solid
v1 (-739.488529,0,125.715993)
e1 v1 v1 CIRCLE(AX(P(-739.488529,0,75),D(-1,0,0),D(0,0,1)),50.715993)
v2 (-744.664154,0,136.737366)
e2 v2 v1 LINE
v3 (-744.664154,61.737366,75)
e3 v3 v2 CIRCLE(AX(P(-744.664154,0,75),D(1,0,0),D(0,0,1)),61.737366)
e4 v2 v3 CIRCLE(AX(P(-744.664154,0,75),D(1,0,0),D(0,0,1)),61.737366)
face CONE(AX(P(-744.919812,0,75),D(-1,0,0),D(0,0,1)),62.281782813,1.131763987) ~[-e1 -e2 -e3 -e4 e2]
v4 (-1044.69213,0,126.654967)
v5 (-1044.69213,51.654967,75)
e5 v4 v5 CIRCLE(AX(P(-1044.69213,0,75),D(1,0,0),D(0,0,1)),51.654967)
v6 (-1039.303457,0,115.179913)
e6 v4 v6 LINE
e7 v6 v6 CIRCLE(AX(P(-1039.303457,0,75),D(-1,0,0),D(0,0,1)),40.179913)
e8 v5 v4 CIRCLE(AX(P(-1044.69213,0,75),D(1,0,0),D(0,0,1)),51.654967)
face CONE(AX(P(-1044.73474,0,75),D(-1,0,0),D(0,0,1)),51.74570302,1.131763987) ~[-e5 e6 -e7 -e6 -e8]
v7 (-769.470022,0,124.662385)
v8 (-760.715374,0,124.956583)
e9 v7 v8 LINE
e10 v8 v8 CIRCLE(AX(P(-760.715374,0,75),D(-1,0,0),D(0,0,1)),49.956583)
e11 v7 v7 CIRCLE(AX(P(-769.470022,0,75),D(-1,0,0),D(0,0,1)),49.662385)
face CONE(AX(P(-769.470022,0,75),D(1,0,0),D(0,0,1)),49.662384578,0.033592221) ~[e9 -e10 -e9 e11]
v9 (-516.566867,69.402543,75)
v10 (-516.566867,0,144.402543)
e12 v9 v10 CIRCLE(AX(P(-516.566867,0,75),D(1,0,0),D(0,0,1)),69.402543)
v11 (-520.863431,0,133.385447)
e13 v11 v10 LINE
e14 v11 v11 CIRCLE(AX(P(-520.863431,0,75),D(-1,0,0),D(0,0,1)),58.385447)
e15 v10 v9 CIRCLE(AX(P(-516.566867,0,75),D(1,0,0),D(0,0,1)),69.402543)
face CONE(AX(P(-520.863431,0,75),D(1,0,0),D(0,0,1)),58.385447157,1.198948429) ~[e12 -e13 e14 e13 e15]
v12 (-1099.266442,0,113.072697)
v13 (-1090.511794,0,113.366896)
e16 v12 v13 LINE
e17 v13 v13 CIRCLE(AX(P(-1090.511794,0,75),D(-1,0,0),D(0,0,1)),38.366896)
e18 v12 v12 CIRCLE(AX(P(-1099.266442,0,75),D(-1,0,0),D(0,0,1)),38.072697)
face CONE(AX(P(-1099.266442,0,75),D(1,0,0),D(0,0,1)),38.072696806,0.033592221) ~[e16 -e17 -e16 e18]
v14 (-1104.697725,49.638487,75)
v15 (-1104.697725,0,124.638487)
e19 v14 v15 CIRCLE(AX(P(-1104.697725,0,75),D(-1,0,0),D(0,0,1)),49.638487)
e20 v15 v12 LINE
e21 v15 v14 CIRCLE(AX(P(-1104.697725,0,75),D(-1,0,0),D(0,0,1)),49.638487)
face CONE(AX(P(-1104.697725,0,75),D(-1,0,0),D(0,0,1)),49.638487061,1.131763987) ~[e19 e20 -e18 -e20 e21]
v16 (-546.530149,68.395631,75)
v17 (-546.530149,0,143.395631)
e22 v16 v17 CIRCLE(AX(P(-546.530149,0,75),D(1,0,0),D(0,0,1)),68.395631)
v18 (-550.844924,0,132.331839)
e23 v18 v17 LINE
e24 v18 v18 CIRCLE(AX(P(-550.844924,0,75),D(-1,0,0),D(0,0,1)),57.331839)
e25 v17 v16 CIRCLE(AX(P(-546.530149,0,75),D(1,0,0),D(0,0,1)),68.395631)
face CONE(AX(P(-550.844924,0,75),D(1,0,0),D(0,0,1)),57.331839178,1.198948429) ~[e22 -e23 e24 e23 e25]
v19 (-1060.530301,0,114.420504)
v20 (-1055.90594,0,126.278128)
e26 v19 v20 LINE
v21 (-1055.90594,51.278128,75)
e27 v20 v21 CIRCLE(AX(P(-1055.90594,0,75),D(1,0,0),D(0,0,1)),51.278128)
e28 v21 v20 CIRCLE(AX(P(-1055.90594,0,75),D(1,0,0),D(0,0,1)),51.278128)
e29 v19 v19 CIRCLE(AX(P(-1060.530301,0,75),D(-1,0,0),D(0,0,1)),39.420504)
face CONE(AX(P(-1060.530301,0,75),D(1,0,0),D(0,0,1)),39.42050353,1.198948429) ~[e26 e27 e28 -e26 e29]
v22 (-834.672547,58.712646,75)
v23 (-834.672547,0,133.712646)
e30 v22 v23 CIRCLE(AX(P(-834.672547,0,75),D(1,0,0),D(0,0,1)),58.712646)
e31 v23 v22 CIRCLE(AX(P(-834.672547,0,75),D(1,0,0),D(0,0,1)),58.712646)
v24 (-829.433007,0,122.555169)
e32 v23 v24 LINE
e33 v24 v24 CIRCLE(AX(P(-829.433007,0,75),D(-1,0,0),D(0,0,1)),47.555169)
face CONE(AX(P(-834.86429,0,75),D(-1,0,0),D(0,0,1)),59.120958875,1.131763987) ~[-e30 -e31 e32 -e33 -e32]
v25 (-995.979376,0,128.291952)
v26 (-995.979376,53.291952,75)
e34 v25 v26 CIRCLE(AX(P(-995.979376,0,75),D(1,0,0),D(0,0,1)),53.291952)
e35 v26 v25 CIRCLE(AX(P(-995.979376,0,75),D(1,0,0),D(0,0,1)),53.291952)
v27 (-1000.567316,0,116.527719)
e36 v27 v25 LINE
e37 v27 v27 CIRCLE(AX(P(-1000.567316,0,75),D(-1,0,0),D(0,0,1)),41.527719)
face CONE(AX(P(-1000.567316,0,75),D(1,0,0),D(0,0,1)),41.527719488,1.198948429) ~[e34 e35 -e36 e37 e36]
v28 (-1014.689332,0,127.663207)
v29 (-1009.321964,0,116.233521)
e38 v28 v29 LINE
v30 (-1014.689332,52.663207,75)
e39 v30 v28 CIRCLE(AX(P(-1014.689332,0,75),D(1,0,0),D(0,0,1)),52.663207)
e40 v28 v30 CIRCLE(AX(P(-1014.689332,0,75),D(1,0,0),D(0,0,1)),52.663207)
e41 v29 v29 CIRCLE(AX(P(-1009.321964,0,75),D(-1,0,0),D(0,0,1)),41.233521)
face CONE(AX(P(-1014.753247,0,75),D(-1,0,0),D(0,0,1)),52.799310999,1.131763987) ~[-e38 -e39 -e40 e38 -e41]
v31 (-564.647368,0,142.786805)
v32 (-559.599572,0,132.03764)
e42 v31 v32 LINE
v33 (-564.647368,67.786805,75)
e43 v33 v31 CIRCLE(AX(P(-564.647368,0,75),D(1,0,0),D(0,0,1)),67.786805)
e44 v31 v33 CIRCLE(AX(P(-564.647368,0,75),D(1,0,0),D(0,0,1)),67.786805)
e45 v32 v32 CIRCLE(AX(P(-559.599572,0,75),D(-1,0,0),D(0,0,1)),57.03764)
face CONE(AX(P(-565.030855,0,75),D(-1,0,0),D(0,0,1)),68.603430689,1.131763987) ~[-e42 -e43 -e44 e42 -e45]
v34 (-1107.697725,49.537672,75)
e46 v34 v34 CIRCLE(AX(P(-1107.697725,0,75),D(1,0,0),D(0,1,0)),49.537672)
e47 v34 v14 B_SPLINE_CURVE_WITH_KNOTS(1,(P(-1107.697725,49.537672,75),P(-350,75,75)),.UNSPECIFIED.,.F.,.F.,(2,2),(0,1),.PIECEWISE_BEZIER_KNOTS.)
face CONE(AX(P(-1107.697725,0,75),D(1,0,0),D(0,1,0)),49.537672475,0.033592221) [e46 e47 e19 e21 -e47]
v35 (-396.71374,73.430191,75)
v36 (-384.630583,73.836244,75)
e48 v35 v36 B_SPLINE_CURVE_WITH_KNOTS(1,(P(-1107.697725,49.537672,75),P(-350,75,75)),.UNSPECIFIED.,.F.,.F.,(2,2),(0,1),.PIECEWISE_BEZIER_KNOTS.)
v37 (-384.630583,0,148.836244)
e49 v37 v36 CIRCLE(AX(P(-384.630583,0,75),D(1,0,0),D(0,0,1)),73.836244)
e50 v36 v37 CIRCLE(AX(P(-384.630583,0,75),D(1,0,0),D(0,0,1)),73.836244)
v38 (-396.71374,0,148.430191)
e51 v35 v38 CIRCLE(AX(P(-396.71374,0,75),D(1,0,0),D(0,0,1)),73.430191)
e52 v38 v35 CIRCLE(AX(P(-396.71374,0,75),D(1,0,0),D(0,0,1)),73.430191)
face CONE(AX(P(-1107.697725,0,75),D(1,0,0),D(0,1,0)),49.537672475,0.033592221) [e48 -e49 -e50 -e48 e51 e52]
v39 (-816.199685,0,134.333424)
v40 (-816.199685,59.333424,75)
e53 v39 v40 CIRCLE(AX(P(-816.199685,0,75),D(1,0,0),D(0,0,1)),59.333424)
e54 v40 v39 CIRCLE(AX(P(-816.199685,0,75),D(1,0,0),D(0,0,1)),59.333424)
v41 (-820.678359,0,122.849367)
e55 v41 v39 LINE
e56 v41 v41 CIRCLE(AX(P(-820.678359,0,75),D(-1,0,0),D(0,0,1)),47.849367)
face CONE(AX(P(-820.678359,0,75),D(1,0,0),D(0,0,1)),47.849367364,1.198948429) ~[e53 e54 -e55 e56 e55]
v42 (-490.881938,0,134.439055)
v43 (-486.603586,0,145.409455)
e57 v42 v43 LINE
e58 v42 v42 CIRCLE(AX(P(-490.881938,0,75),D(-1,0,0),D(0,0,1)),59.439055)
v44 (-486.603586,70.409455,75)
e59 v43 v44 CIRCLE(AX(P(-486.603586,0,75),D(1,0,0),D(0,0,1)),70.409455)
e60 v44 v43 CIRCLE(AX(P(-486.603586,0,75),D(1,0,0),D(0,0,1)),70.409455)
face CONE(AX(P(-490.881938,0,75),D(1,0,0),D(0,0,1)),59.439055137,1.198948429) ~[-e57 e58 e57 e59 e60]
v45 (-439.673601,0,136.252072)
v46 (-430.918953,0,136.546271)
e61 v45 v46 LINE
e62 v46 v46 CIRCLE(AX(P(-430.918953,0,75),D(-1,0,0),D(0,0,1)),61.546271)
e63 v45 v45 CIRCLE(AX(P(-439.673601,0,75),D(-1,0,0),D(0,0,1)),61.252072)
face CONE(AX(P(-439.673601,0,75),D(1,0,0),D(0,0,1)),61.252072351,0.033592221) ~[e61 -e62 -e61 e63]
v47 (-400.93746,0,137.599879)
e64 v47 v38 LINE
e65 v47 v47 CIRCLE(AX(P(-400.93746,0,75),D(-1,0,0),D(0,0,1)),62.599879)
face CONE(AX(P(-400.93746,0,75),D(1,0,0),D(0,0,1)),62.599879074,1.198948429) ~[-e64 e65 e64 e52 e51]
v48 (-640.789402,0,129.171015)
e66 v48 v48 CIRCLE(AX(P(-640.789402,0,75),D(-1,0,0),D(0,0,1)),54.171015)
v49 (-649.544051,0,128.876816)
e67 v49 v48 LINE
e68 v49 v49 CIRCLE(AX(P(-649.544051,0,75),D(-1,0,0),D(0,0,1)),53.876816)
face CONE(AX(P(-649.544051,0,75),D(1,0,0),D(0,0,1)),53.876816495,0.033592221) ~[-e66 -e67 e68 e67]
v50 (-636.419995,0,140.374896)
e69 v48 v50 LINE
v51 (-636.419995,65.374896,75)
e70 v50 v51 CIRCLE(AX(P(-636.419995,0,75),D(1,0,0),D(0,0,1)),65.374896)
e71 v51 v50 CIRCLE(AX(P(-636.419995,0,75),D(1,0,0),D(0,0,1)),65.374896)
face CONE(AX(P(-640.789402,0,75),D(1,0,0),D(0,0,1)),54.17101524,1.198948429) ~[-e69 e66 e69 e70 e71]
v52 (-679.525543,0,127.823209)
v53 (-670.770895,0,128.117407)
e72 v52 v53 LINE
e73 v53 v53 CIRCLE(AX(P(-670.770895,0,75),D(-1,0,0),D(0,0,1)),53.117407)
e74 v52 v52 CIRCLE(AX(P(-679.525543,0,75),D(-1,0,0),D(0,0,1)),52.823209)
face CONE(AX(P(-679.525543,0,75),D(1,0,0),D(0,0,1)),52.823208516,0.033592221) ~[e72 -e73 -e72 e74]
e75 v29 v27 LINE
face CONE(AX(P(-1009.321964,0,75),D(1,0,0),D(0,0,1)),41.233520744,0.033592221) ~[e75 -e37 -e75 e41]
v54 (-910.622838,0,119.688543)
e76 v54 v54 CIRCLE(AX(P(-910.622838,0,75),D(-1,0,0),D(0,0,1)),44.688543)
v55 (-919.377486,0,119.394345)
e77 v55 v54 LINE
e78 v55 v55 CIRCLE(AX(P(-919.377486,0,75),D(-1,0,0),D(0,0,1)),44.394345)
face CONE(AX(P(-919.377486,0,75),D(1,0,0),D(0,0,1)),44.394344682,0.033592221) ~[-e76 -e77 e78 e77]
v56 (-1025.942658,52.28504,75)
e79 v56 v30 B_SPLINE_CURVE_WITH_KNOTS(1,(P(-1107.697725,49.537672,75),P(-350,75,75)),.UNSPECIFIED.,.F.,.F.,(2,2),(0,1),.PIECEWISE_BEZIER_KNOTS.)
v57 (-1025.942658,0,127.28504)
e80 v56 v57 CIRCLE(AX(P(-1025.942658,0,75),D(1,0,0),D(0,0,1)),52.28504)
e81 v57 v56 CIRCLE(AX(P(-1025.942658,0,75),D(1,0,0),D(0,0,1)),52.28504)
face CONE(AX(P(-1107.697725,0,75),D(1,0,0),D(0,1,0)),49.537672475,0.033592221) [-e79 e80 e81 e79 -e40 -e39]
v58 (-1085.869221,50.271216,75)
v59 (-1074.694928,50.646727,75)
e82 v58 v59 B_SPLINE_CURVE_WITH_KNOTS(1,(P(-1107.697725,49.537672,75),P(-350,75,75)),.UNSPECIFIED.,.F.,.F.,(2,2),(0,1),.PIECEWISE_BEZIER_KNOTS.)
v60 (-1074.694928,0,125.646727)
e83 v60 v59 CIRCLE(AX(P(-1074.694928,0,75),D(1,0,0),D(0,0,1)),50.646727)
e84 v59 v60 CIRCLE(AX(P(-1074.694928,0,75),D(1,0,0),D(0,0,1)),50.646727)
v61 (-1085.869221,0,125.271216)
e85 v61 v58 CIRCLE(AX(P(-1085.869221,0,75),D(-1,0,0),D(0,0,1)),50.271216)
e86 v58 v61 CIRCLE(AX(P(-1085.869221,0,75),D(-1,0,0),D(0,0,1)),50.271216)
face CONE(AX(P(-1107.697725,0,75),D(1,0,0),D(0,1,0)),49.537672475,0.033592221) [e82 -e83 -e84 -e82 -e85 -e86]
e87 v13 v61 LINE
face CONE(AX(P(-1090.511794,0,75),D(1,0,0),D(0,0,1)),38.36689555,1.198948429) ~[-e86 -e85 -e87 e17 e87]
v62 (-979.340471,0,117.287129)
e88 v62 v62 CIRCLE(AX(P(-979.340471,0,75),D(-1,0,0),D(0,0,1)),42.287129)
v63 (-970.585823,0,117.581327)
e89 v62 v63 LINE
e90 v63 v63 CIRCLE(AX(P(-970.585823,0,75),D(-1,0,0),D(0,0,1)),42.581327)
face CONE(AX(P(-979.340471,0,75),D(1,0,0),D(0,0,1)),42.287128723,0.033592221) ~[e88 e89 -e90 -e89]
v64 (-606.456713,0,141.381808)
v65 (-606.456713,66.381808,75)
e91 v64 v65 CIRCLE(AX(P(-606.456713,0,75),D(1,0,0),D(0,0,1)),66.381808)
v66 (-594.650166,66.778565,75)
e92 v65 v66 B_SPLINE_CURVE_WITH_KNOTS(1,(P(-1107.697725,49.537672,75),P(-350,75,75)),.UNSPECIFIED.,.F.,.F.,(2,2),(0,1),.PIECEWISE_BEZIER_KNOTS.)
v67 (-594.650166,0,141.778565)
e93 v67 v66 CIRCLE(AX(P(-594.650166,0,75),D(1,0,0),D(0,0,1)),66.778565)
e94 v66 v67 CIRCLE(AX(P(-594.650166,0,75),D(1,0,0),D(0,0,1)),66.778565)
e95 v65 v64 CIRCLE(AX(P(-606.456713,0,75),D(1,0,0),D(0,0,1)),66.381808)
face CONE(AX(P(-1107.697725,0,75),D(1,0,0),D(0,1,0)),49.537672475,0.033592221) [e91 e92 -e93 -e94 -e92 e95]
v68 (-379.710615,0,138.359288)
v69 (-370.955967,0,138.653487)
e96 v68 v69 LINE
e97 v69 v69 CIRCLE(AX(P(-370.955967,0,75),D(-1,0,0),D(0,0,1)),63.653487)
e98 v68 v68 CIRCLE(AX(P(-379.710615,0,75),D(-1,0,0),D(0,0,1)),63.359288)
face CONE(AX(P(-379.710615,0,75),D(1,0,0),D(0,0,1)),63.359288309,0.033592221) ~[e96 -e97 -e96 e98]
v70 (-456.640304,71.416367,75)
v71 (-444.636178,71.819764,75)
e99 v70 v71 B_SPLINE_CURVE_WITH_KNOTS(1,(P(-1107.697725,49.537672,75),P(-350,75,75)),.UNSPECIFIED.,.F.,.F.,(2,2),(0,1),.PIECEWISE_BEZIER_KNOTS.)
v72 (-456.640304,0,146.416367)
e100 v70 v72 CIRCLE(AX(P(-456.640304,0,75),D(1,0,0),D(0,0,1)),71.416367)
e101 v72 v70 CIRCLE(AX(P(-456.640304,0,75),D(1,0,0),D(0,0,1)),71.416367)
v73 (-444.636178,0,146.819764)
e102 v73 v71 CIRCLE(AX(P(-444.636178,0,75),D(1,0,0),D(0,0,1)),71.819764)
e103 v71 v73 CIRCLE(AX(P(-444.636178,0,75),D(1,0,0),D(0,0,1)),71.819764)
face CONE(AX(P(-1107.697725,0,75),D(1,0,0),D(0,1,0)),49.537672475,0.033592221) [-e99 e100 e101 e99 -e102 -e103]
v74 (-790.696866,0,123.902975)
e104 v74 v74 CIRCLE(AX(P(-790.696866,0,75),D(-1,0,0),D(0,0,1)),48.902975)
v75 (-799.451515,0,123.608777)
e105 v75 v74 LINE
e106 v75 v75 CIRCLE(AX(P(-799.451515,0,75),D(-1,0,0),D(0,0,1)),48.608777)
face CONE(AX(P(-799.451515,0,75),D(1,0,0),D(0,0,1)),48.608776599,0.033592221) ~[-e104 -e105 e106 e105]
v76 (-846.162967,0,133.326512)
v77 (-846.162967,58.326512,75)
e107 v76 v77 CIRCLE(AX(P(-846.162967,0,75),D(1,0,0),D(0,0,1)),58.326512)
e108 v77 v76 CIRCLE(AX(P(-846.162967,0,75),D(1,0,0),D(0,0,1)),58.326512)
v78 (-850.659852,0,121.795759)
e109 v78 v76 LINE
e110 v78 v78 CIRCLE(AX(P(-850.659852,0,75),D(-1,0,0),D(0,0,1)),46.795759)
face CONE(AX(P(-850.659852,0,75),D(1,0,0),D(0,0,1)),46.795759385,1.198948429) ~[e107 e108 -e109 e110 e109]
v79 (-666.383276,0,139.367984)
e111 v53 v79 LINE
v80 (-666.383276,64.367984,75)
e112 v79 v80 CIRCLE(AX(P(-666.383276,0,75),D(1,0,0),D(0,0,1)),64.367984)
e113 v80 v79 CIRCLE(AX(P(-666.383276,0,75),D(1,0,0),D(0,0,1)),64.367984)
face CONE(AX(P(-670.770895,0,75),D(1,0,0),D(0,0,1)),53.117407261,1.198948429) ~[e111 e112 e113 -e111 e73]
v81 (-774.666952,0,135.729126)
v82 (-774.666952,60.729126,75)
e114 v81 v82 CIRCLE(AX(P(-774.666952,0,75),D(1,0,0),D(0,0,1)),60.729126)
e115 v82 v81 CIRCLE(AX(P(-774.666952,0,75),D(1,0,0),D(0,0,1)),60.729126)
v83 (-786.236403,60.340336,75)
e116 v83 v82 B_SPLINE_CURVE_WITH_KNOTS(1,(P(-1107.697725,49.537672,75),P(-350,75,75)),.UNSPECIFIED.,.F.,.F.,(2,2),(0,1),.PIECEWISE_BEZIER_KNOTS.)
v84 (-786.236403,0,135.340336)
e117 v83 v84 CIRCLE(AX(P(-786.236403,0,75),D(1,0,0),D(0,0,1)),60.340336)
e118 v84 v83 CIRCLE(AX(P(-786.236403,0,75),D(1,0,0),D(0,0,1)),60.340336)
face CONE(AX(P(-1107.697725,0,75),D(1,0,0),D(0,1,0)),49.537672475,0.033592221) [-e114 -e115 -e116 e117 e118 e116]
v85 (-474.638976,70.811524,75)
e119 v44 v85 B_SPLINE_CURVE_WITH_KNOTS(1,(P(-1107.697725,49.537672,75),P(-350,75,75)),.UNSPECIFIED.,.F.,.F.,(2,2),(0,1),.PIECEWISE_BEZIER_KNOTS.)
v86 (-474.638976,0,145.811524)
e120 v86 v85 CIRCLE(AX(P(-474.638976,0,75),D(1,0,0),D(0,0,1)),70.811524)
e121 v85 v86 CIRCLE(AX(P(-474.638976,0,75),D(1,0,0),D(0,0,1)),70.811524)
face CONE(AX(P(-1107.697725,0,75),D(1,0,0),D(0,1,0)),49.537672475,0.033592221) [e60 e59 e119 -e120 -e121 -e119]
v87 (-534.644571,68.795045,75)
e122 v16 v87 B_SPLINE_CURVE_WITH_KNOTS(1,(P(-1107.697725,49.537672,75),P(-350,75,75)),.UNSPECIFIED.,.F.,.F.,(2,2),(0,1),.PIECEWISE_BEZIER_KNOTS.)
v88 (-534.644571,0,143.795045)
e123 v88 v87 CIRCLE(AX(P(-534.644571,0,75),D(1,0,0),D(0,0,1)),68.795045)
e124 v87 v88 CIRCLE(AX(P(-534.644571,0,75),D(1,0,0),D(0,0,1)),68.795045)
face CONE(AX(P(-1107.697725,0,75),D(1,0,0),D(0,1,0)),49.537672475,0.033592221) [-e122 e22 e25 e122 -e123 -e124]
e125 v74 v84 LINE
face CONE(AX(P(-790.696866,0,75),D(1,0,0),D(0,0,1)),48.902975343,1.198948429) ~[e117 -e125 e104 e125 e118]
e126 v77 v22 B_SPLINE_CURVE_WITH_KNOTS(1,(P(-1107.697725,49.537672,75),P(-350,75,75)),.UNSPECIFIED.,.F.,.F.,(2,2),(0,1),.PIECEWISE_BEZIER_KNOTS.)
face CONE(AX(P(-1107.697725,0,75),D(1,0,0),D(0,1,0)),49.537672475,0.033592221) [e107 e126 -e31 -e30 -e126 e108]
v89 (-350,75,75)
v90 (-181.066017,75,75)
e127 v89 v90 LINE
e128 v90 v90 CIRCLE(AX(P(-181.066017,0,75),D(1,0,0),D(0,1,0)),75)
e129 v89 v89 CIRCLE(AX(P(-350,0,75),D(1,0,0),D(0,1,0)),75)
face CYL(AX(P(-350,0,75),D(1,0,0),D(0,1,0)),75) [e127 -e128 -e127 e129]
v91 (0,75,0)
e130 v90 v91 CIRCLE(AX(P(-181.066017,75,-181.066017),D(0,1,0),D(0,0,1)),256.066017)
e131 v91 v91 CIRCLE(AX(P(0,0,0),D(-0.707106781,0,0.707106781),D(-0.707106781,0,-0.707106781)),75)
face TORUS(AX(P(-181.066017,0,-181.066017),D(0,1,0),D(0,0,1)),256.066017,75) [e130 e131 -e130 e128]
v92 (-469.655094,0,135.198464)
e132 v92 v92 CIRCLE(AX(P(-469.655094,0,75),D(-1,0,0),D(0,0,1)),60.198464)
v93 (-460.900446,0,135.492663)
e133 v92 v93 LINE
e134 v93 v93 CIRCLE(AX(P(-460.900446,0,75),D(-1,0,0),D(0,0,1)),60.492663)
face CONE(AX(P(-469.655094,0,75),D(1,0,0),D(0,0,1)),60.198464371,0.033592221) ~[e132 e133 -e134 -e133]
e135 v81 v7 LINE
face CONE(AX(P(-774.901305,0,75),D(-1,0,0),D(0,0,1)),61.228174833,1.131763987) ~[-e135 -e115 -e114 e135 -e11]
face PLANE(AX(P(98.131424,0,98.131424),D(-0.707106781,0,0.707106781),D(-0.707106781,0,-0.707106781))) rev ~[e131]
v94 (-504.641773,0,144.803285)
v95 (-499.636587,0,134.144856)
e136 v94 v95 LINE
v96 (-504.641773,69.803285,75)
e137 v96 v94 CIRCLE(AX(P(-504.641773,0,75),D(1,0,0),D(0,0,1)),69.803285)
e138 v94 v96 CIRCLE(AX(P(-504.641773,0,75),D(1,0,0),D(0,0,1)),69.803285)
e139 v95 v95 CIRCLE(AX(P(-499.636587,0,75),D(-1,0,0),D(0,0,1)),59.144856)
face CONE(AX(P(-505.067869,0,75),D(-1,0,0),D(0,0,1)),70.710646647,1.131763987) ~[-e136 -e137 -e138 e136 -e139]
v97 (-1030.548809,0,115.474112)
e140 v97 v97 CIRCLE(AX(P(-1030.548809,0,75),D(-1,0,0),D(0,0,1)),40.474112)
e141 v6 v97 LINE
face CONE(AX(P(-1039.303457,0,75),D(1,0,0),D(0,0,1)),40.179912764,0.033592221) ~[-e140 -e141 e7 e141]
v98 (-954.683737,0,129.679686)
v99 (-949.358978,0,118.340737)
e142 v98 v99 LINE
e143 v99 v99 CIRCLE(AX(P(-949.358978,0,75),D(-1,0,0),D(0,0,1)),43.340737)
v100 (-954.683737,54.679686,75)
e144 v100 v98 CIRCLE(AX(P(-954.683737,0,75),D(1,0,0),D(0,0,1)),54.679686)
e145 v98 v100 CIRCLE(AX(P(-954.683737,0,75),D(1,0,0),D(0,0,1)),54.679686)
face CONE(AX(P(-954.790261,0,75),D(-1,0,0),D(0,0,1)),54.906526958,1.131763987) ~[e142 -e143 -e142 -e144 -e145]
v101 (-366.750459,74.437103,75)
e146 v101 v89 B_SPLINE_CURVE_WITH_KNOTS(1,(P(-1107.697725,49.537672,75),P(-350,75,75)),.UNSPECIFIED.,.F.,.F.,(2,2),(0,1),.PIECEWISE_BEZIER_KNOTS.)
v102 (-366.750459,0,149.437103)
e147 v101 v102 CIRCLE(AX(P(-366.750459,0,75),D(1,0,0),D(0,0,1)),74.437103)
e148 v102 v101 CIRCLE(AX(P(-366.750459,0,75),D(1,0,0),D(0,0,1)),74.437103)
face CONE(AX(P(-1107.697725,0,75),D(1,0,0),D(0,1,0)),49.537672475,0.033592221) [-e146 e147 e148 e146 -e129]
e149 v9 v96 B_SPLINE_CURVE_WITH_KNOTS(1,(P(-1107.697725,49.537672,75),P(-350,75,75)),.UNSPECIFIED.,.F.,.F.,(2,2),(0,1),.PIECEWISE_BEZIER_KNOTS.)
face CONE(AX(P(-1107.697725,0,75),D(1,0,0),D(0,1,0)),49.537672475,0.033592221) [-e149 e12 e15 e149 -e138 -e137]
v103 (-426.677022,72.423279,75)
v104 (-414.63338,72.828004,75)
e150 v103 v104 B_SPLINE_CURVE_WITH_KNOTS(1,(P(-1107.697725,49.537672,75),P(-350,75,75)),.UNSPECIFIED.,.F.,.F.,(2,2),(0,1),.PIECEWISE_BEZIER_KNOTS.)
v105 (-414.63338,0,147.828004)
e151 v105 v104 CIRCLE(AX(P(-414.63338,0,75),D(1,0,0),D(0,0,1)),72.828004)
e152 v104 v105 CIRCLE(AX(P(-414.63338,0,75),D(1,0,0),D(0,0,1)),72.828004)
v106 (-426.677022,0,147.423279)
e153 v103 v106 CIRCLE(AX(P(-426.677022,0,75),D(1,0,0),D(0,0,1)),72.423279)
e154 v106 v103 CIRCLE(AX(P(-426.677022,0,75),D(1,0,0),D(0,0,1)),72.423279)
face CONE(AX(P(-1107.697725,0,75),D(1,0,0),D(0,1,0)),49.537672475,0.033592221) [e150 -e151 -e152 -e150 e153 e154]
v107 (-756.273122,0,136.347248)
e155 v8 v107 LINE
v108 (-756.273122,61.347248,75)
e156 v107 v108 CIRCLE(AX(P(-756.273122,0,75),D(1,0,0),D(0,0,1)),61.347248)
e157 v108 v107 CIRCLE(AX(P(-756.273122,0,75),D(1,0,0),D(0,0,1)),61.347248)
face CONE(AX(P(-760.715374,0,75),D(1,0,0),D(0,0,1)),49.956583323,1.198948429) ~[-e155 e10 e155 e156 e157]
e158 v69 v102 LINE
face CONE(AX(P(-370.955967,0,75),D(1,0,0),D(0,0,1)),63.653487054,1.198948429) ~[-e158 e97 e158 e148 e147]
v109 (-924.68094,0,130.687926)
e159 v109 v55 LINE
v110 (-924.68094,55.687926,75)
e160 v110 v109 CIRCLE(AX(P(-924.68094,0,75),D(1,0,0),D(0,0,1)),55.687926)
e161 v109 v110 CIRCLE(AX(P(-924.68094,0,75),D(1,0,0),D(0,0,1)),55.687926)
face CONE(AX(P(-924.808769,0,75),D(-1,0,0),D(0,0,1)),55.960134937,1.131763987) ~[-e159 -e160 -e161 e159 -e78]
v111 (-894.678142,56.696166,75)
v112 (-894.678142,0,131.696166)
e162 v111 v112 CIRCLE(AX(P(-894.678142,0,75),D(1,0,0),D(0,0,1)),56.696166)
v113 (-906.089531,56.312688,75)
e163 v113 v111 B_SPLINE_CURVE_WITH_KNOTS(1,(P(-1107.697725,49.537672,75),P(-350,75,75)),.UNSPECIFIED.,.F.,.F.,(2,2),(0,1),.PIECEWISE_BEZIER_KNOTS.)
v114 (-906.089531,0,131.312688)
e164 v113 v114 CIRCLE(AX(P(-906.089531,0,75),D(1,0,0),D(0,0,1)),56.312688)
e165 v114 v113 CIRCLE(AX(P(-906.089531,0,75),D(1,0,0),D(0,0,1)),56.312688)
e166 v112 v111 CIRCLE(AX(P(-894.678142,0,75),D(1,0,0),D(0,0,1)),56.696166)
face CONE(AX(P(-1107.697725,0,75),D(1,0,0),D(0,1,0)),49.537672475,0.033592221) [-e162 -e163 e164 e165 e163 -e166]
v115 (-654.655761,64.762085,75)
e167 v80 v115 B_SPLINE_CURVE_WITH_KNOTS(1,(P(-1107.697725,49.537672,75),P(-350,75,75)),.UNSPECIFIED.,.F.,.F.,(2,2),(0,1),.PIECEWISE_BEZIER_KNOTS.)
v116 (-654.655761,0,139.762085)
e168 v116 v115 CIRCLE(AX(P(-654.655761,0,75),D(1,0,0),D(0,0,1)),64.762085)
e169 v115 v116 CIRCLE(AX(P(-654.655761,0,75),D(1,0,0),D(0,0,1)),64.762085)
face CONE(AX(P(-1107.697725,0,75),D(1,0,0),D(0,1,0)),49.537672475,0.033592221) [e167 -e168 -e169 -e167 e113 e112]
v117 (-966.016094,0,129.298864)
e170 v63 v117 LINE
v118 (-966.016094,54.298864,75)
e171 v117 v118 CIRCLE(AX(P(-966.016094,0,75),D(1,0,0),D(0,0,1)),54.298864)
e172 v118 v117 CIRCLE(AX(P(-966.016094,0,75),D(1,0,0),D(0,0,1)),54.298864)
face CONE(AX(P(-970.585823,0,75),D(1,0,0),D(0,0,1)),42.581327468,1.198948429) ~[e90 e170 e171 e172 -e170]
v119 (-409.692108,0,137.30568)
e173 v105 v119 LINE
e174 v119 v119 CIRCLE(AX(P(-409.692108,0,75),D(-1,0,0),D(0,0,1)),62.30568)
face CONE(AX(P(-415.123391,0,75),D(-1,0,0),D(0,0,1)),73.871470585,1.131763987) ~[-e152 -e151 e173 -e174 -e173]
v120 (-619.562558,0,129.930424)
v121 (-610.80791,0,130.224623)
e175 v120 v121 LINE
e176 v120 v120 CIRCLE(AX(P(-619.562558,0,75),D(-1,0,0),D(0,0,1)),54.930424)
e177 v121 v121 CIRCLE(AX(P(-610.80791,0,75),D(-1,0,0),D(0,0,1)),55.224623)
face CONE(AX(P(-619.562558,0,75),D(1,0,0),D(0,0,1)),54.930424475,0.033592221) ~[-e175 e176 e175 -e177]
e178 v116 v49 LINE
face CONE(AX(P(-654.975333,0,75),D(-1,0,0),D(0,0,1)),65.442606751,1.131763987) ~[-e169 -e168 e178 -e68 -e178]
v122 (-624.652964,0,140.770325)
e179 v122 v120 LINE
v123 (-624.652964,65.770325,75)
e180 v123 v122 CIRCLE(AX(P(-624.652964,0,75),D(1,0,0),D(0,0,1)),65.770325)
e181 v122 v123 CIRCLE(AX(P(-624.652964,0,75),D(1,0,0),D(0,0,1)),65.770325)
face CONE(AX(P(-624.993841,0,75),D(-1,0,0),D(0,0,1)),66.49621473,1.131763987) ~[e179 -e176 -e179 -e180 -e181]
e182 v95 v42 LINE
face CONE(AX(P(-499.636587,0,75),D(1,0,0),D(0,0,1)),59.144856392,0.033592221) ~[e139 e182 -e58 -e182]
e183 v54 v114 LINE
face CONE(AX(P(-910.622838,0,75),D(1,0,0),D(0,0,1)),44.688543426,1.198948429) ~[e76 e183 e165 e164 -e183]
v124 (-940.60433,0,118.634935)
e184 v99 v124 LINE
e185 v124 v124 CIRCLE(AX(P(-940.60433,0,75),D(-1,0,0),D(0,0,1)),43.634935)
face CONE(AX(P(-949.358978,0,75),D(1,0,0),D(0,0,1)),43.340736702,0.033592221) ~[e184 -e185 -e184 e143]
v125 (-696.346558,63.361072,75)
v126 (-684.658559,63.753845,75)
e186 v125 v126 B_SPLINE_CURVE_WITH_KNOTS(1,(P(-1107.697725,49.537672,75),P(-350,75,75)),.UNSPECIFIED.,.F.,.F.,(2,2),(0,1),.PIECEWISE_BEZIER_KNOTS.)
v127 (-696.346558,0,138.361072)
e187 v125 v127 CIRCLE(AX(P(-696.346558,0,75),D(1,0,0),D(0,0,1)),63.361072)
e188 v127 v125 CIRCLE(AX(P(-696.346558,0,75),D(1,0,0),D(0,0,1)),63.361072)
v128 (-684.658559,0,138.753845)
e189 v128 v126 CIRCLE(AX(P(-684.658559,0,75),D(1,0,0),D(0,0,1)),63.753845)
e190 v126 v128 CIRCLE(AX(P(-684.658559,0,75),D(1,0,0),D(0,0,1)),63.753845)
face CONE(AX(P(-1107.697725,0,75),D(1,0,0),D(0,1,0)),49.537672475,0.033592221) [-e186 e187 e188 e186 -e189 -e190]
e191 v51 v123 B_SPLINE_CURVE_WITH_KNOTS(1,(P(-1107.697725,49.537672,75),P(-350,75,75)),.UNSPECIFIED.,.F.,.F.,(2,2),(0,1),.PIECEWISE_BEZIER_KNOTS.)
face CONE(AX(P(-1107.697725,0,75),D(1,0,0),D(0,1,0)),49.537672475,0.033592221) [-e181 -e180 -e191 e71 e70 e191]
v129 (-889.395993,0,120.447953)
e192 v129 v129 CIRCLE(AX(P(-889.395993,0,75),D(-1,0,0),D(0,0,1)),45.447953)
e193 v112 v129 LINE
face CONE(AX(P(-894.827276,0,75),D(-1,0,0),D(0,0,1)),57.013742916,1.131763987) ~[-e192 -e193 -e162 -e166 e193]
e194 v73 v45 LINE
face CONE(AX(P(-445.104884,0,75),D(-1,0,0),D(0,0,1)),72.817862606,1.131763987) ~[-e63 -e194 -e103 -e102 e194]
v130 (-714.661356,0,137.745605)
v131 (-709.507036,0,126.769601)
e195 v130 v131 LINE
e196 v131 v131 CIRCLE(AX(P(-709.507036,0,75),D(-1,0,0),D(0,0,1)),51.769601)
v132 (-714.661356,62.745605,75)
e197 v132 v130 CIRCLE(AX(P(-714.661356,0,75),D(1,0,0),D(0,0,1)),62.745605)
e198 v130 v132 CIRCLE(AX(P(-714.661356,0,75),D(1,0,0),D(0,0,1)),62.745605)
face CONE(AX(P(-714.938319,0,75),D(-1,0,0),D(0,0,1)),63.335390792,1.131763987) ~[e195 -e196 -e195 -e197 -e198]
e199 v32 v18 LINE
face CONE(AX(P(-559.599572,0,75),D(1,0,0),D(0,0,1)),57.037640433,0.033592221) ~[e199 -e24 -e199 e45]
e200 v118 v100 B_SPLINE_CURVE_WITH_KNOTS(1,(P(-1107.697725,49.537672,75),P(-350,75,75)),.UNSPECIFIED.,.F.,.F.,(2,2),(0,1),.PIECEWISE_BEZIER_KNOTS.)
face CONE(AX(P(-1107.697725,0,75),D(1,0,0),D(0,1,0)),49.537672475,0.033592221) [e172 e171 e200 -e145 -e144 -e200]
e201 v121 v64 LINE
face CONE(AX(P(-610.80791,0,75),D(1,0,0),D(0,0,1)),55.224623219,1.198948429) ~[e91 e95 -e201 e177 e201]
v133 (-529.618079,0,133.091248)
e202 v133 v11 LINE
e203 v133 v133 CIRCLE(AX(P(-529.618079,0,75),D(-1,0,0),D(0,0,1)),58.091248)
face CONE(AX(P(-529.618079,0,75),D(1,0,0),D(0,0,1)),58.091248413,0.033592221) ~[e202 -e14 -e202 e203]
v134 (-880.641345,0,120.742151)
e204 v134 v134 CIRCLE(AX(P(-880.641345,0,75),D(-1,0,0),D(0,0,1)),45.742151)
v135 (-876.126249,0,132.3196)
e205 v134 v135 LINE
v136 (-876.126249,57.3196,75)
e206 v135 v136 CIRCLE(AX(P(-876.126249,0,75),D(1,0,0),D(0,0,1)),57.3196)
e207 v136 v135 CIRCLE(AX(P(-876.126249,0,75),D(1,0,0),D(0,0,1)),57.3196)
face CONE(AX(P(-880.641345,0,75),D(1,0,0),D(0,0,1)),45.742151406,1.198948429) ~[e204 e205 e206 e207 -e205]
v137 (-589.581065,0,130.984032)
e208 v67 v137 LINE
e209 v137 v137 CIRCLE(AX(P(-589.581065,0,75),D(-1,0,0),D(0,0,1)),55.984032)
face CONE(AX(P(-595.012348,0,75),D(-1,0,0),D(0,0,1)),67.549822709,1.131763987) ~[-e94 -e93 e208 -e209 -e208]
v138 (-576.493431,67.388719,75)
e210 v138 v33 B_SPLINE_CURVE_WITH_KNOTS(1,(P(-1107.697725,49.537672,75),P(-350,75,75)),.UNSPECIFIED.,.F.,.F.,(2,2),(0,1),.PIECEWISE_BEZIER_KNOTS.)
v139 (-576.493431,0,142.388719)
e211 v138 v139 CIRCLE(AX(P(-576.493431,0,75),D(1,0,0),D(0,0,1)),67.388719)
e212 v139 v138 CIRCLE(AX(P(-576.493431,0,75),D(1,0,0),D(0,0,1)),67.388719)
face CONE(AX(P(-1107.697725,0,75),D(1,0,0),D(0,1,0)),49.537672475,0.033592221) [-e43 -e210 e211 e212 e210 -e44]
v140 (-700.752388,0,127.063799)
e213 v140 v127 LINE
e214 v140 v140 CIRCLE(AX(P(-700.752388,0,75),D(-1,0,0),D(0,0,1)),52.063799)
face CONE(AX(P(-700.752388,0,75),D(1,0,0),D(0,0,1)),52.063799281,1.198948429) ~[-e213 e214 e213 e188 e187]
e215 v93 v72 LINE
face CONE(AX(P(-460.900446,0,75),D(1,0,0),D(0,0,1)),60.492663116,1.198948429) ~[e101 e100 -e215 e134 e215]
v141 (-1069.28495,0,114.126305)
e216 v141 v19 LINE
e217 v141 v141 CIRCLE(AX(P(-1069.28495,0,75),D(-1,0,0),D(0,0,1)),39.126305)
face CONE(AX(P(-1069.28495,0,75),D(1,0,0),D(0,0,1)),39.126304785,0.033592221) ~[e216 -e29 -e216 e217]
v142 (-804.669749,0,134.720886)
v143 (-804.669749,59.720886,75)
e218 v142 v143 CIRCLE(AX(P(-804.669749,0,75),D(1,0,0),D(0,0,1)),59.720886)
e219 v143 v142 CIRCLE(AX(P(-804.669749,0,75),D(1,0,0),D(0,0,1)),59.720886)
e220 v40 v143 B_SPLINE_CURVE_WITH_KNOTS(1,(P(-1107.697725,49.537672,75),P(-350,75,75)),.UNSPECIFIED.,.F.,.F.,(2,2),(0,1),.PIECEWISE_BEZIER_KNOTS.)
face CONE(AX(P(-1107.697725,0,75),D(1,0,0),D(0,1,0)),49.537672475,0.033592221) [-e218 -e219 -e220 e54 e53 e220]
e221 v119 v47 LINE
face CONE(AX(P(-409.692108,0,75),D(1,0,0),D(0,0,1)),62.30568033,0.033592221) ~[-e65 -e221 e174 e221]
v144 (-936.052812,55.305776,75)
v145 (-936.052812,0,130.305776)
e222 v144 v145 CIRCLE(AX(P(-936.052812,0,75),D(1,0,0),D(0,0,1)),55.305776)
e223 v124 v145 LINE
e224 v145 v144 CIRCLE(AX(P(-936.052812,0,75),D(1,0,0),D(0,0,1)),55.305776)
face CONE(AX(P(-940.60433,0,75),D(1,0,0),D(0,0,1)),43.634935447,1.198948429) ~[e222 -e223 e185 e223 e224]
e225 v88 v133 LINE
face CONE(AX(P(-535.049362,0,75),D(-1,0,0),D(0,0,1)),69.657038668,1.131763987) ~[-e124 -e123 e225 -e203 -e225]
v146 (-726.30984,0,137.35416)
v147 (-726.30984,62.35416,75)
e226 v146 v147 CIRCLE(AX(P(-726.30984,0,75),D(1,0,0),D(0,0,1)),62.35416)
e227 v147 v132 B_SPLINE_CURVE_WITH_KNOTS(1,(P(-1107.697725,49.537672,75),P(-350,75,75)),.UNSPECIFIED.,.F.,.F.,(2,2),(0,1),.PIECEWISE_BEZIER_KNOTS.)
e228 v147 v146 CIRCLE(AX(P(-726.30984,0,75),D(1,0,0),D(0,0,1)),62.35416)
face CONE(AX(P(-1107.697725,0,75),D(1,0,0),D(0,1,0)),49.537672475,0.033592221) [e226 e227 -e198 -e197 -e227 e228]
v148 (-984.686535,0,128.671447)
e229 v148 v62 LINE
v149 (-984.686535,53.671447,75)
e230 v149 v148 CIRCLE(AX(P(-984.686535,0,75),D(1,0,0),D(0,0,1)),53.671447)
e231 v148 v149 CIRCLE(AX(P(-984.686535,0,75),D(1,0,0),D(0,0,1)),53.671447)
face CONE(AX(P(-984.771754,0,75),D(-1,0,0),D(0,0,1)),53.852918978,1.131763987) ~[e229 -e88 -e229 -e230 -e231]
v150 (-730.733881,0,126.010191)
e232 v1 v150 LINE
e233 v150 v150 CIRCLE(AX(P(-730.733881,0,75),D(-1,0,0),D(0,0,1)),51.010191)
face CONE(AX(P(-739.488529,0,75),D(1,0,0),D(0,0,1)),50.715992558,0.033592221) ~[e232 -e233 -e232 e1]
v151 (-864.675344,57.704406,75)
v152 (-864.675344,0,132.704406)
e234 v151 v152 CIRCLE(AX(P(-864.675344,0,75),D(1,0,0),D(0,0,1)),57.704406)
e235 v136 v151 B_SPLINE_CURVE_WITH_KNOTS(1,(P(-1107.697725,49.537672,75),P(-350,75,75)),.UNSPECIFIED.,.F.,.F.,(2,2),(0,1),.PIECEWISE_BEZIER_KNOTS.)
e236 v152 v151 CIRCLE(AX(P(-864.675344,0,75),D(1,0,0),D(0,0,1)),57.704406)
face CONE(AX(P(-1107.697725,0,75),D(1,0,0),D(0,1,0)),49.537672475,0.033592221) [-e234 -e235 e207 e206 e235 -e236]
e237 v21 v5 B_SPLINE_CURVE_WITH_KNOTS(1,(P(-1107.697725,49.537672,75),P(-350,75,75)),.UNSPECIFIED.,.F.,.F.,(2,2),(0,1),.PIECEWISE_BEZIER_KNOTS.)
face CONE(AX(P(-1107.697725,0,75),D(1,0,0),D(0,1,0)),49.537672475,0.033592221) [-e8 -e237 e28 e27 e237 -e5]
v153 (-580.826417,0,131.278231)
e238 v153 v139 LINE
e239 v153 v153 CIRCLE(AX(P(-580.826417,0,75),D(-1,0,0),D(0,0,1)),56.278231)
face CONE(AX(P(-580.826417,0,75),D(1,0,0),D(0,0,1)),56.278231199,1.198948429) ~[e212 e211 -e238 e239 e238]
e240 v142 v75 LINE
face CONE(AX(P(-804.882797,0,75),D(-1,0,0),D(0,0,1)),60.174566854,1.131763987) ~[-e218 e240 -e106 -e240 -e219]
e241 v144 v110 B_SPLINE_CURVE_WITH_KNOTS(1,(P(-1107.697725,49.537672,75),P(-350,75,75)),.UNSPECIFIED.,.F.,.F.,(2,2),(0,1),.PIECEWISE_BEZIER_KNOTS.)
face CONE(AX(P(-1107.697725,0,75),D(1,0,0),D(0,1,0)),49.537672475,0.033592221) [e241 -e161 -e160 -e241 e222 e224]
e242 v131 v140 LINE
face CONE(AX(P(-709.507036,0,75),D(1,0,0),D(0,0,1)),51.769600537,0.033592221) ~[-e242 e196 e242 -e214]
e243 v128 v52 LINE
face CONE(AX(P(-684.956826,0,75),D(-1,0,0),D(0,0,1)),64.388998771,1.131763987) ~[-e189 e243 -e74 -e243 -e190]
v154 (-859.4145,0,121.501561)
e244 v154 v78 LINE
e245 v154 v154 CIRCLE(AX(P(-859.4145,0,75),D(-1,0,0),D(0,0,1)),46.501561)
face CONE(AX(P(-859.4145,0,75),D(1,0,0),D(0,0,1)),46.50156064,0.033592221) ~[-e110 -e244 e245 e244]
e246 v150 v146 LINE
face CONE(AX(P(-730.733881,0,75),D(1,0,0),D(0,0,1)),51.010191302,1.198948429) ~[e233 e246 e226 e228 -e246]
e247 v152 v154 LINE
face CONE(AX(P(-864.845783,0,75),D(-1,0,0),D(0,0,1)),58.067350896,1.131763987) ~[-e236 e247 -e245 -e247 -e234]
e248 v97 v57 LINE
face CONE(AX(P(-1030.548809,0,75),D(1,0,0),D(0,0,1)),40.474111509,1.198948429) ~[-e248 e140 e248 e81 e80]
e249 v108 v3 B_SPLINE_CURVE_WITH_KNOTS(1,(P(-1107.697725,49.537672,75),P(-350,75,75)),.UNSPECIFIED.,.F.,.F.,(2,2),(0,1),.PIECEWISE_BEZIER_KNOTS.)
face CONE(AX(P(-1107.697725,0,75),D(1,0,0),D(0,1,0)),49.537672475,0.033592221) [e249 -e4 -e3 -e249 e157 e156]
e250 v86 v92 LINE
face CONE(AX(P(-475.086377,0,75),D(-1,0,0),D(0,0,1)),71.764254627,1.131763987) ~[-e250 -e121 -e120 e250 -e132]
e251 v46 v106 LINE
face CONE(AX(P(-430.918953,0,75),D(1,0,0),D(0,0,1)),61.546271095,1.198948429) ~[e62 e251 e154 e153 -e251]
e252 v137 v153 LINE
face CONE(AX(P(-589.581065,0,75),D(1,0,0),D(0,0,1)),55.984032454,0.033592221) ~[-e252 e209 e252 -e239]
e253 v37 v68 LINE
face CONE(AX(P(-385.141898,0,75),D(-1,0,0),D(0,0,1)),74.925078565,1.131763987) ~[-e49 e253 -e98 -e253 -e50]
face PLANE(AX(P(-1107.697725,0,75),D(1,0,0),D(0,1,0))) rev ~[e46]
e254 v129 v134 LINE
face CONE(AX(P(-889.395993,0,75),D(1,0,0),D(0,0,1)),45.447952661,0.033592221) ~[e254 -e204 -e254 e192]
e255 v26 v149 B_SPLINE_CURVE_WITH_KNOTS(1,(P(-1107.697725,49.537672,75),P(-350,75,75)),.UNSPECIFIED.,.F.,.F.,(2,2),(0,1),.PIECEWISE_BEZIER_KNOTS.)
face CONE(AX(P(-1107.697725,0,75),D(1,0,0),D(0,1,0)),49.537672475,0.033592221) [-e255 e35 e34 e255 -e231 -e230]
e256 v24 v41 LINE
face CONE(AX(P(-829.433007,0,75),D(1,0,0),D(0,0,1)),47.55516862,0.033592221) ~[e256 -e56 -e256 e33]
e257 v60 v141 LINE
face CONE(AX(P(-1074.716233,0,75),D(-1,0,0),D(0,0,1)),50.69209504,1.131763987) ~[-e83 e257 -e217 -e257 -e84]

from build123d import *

# Parameters (mm, degrees)
F3_R      = 75
F8_R      = 49.537672475
F13_DEPTH = 232


with BuildPart() as f4:
    # F4: sweep along a path in F0
    with BuildLine(Plane.XZ) as f4_path:
        Line((-350, 75), (-181.066017178, 75))
        ThreePointArc((-181.066017178, 75), (0, 0), (75, -181.066017178))
        Line((75, -181.066017178), (75, -350))
    # F3 (on plane+point) → F4 (sweep)
    with BuildSketch(Plane.YZ.offset(-350)):
        with Locations((0, 75)):
            Circle(F3_R)
    sweep(path=f4_path.line)

    # F8 (on plane+point) → F9 section 0
    with BuildSketch(Plane.YZ.offset(-1107.697725296)):
        with Locations((0, 75)):
            Circle(F8_R)
    # F3 (on plane+point) → F9 section 1
    with BuildSketch(Plane.YZ.offset(-350)):
        with Locations((0, 75)):
            Circle(F3_R)
    loft()

    # F10 (on Front) → F11 (revolve, cut)
    with BuildSketch(Plane.XZ):
        Polygon((-1085.869221311, 125.2712163399), (-1104.697725296, 124.6384870611), (-1099.2664424752, 113.0726968058), (-1090.5117942881, 113.3668955503), align=None)
        Polygon((-1060.530301493, 114.4205035296), (-1055.8877285158, 126.3248243192), (-1074.7162325009, 125.6920950404), (-1069.28494968, 114.1263047851), align=None)
        Polygon((-1030.5488086978, 115.4741115089), (-1025.9062357207, 127.3784322985), (-1044.7347397057, 126.7457030197), (-1039.3034568849, 115.1799127644), align=None)
        Polygon((-1000.5673159027, 116.5277194882), (-995.9247429255, 128.4320402778), (-1014.7532469106, 127.799310999), (-1009.3219640897, 116.2335207437), align=None)
        Polygon((-970.5858231075, 117.5813274675), (-965.9432501303, 129.4856482571), (-984.7717541154, 128.8529189783), (-979.3404712946, 117.287128723), align=None)
        Polygon((-940.6043303123, 118.6349354468), (-935.9617573352, 130.5392562364), (-954.7902613202, 129.9065269576), (-949.3589784994, 118.3407367023), align=None)
        Polygon((-910.6228375172, 119.6885434262), (-905.98026454, 131.5928642158), (-924.8087685251, 130.960134937), (-919.3774857043, 119.3943446816), align=None)
        Polygon((-880.641344722, 120.7421514055), (-875.9987717449, 132.6464721951), (-894.8272757299, 132.0137429163), (-889.3959929091, 120.447952661), align=None)
        Polygon((-850.6598519269, 121.7957593848), (-846.0172789497, 133.7000801744), (-864.8457829348, 133.0673508956), (-859.4145001139, 121.5015606403), align=None)
        Polygon((-820.6783591317, 122.8493673641), (-816.0357861546, 134.7536881537), (-834.8642901396, 134.1209588749), (-829.4330073188, 122.5551686196), align=None)
        Polygon((-790.6968663366, 123.9029753434), (-786.0542933594, 135.807296133), (-804.8827973445, 135.1745668542), (-799.4515145236, 123.6087765989), align=None)
        Polygon((-760.7153735414, 124.9565833227), (-756.0728005643, 136.8609041123), (-774.9013045493, 136.2281748335), (-769.4700217285, 124.6623845782), align=None)
        Polygon((-730.7338807463, 126.010191302), (-726.0913077691, 137.9145120916), (-744.9198117542, 137.2817828128), (-739.4885289333, 125.7159925575), align=None)
        Polygon((-700.7523879511, 127.0637992813), (-696.1098149739, 138.9681200709), (-714.938318959, 138.3353907921), (-709.5070361382, 126.7696005368), align=None)
        Polygon((-670.770895156, 128.1174072606), (-666.1283221788, 140.0217280502), (-684.9568261639, 139.3889987714), (-679.525543343, 127.8232085161), align=None)
        Polygon((-640.7894023608, 129.17101524), (-636.1468293836, 141.0753360296), (-654.9753333687, 140.4426067508), (-649.5440505479, 128.8768164954), align=None)
        Polygon((-610.8079095656, 130.2246232193), (-606.1653365885, 142.1289440089), (-624.9938405735, 141.4962147301), (-619.5625577527, 129.9304244747), align=None)
        Polygon((-580.8264167705, 131.2782311986), (-576.1838437933, 143.1825519882), (-595.0123477784, 142.5498227094), (-589.5810649575, 130.9840324541), align=None)
        Polygon((-550.8449239753, 132.3318391779), (-546.2023509982, 144.2361599675), (-565.0308549832, 143.6034306887), (-559.5995721624, 132.0376404334), align=None)
        Polygon((-520.8634311802, 133.3854471572), (-516.220858203, 145.2897679468), (-535.0493621881, 144.657038668), (-529.6180793672, 133.0912484127), align=None)
        Polygon((-490.881938385, 134.4390551365), (-486.2393654079, 146.3433759261), (-505.0678693929, 145.7106466473), (-499.6365865721, 134.144856392), align=None)
        Polygon((-460.9004455899, 135.4926631158), (-456.2578726127, 147.3969839054), (-475.0863765978, 146.7642546266), (-469.6550937769, 135.1984643713), align=None)
        Polygon((-430.9189527947, 136.5462710951), (-426.2763798176, 148.4505918847), (-445.1048838026, 147.8178626059), (-439.6736009818, 136.2520723506), align=None)
        Polygon((-400.9374599996, 137.5998790744), (-396.2948870224, 149.504199864), (-415.1233910075, 148.8714705852), (-409.6921081866, 137.3056803299), align=None)
        Polygon((-370.9559672044, 138.6534870538), (-366.3133942272, 150.5578078433), (-385.1418982123, 149.9250785646), (-379.7106153915, 138.3592883092), align=None)
    revolve(axis=Axis((-609.0528770564, 0, 75), (-1, 0, 0)), mode=Mode.SUBTRACT)

    # F12 (on Front) → F13 (cut, symmetric)
    with BuildSketch(Plane.XZ):
        Polygon((98.1314237101, 98.1314237101), (-114.6691401448, -114.6691401448), (-121.5471847165, -389.7904326519), (441.9294075858, -378.4590830407), align=None)
    extrude(amount=F13_DEPTH, both=True, mode=Mode.SUBTRACT)


solid = f4.part
